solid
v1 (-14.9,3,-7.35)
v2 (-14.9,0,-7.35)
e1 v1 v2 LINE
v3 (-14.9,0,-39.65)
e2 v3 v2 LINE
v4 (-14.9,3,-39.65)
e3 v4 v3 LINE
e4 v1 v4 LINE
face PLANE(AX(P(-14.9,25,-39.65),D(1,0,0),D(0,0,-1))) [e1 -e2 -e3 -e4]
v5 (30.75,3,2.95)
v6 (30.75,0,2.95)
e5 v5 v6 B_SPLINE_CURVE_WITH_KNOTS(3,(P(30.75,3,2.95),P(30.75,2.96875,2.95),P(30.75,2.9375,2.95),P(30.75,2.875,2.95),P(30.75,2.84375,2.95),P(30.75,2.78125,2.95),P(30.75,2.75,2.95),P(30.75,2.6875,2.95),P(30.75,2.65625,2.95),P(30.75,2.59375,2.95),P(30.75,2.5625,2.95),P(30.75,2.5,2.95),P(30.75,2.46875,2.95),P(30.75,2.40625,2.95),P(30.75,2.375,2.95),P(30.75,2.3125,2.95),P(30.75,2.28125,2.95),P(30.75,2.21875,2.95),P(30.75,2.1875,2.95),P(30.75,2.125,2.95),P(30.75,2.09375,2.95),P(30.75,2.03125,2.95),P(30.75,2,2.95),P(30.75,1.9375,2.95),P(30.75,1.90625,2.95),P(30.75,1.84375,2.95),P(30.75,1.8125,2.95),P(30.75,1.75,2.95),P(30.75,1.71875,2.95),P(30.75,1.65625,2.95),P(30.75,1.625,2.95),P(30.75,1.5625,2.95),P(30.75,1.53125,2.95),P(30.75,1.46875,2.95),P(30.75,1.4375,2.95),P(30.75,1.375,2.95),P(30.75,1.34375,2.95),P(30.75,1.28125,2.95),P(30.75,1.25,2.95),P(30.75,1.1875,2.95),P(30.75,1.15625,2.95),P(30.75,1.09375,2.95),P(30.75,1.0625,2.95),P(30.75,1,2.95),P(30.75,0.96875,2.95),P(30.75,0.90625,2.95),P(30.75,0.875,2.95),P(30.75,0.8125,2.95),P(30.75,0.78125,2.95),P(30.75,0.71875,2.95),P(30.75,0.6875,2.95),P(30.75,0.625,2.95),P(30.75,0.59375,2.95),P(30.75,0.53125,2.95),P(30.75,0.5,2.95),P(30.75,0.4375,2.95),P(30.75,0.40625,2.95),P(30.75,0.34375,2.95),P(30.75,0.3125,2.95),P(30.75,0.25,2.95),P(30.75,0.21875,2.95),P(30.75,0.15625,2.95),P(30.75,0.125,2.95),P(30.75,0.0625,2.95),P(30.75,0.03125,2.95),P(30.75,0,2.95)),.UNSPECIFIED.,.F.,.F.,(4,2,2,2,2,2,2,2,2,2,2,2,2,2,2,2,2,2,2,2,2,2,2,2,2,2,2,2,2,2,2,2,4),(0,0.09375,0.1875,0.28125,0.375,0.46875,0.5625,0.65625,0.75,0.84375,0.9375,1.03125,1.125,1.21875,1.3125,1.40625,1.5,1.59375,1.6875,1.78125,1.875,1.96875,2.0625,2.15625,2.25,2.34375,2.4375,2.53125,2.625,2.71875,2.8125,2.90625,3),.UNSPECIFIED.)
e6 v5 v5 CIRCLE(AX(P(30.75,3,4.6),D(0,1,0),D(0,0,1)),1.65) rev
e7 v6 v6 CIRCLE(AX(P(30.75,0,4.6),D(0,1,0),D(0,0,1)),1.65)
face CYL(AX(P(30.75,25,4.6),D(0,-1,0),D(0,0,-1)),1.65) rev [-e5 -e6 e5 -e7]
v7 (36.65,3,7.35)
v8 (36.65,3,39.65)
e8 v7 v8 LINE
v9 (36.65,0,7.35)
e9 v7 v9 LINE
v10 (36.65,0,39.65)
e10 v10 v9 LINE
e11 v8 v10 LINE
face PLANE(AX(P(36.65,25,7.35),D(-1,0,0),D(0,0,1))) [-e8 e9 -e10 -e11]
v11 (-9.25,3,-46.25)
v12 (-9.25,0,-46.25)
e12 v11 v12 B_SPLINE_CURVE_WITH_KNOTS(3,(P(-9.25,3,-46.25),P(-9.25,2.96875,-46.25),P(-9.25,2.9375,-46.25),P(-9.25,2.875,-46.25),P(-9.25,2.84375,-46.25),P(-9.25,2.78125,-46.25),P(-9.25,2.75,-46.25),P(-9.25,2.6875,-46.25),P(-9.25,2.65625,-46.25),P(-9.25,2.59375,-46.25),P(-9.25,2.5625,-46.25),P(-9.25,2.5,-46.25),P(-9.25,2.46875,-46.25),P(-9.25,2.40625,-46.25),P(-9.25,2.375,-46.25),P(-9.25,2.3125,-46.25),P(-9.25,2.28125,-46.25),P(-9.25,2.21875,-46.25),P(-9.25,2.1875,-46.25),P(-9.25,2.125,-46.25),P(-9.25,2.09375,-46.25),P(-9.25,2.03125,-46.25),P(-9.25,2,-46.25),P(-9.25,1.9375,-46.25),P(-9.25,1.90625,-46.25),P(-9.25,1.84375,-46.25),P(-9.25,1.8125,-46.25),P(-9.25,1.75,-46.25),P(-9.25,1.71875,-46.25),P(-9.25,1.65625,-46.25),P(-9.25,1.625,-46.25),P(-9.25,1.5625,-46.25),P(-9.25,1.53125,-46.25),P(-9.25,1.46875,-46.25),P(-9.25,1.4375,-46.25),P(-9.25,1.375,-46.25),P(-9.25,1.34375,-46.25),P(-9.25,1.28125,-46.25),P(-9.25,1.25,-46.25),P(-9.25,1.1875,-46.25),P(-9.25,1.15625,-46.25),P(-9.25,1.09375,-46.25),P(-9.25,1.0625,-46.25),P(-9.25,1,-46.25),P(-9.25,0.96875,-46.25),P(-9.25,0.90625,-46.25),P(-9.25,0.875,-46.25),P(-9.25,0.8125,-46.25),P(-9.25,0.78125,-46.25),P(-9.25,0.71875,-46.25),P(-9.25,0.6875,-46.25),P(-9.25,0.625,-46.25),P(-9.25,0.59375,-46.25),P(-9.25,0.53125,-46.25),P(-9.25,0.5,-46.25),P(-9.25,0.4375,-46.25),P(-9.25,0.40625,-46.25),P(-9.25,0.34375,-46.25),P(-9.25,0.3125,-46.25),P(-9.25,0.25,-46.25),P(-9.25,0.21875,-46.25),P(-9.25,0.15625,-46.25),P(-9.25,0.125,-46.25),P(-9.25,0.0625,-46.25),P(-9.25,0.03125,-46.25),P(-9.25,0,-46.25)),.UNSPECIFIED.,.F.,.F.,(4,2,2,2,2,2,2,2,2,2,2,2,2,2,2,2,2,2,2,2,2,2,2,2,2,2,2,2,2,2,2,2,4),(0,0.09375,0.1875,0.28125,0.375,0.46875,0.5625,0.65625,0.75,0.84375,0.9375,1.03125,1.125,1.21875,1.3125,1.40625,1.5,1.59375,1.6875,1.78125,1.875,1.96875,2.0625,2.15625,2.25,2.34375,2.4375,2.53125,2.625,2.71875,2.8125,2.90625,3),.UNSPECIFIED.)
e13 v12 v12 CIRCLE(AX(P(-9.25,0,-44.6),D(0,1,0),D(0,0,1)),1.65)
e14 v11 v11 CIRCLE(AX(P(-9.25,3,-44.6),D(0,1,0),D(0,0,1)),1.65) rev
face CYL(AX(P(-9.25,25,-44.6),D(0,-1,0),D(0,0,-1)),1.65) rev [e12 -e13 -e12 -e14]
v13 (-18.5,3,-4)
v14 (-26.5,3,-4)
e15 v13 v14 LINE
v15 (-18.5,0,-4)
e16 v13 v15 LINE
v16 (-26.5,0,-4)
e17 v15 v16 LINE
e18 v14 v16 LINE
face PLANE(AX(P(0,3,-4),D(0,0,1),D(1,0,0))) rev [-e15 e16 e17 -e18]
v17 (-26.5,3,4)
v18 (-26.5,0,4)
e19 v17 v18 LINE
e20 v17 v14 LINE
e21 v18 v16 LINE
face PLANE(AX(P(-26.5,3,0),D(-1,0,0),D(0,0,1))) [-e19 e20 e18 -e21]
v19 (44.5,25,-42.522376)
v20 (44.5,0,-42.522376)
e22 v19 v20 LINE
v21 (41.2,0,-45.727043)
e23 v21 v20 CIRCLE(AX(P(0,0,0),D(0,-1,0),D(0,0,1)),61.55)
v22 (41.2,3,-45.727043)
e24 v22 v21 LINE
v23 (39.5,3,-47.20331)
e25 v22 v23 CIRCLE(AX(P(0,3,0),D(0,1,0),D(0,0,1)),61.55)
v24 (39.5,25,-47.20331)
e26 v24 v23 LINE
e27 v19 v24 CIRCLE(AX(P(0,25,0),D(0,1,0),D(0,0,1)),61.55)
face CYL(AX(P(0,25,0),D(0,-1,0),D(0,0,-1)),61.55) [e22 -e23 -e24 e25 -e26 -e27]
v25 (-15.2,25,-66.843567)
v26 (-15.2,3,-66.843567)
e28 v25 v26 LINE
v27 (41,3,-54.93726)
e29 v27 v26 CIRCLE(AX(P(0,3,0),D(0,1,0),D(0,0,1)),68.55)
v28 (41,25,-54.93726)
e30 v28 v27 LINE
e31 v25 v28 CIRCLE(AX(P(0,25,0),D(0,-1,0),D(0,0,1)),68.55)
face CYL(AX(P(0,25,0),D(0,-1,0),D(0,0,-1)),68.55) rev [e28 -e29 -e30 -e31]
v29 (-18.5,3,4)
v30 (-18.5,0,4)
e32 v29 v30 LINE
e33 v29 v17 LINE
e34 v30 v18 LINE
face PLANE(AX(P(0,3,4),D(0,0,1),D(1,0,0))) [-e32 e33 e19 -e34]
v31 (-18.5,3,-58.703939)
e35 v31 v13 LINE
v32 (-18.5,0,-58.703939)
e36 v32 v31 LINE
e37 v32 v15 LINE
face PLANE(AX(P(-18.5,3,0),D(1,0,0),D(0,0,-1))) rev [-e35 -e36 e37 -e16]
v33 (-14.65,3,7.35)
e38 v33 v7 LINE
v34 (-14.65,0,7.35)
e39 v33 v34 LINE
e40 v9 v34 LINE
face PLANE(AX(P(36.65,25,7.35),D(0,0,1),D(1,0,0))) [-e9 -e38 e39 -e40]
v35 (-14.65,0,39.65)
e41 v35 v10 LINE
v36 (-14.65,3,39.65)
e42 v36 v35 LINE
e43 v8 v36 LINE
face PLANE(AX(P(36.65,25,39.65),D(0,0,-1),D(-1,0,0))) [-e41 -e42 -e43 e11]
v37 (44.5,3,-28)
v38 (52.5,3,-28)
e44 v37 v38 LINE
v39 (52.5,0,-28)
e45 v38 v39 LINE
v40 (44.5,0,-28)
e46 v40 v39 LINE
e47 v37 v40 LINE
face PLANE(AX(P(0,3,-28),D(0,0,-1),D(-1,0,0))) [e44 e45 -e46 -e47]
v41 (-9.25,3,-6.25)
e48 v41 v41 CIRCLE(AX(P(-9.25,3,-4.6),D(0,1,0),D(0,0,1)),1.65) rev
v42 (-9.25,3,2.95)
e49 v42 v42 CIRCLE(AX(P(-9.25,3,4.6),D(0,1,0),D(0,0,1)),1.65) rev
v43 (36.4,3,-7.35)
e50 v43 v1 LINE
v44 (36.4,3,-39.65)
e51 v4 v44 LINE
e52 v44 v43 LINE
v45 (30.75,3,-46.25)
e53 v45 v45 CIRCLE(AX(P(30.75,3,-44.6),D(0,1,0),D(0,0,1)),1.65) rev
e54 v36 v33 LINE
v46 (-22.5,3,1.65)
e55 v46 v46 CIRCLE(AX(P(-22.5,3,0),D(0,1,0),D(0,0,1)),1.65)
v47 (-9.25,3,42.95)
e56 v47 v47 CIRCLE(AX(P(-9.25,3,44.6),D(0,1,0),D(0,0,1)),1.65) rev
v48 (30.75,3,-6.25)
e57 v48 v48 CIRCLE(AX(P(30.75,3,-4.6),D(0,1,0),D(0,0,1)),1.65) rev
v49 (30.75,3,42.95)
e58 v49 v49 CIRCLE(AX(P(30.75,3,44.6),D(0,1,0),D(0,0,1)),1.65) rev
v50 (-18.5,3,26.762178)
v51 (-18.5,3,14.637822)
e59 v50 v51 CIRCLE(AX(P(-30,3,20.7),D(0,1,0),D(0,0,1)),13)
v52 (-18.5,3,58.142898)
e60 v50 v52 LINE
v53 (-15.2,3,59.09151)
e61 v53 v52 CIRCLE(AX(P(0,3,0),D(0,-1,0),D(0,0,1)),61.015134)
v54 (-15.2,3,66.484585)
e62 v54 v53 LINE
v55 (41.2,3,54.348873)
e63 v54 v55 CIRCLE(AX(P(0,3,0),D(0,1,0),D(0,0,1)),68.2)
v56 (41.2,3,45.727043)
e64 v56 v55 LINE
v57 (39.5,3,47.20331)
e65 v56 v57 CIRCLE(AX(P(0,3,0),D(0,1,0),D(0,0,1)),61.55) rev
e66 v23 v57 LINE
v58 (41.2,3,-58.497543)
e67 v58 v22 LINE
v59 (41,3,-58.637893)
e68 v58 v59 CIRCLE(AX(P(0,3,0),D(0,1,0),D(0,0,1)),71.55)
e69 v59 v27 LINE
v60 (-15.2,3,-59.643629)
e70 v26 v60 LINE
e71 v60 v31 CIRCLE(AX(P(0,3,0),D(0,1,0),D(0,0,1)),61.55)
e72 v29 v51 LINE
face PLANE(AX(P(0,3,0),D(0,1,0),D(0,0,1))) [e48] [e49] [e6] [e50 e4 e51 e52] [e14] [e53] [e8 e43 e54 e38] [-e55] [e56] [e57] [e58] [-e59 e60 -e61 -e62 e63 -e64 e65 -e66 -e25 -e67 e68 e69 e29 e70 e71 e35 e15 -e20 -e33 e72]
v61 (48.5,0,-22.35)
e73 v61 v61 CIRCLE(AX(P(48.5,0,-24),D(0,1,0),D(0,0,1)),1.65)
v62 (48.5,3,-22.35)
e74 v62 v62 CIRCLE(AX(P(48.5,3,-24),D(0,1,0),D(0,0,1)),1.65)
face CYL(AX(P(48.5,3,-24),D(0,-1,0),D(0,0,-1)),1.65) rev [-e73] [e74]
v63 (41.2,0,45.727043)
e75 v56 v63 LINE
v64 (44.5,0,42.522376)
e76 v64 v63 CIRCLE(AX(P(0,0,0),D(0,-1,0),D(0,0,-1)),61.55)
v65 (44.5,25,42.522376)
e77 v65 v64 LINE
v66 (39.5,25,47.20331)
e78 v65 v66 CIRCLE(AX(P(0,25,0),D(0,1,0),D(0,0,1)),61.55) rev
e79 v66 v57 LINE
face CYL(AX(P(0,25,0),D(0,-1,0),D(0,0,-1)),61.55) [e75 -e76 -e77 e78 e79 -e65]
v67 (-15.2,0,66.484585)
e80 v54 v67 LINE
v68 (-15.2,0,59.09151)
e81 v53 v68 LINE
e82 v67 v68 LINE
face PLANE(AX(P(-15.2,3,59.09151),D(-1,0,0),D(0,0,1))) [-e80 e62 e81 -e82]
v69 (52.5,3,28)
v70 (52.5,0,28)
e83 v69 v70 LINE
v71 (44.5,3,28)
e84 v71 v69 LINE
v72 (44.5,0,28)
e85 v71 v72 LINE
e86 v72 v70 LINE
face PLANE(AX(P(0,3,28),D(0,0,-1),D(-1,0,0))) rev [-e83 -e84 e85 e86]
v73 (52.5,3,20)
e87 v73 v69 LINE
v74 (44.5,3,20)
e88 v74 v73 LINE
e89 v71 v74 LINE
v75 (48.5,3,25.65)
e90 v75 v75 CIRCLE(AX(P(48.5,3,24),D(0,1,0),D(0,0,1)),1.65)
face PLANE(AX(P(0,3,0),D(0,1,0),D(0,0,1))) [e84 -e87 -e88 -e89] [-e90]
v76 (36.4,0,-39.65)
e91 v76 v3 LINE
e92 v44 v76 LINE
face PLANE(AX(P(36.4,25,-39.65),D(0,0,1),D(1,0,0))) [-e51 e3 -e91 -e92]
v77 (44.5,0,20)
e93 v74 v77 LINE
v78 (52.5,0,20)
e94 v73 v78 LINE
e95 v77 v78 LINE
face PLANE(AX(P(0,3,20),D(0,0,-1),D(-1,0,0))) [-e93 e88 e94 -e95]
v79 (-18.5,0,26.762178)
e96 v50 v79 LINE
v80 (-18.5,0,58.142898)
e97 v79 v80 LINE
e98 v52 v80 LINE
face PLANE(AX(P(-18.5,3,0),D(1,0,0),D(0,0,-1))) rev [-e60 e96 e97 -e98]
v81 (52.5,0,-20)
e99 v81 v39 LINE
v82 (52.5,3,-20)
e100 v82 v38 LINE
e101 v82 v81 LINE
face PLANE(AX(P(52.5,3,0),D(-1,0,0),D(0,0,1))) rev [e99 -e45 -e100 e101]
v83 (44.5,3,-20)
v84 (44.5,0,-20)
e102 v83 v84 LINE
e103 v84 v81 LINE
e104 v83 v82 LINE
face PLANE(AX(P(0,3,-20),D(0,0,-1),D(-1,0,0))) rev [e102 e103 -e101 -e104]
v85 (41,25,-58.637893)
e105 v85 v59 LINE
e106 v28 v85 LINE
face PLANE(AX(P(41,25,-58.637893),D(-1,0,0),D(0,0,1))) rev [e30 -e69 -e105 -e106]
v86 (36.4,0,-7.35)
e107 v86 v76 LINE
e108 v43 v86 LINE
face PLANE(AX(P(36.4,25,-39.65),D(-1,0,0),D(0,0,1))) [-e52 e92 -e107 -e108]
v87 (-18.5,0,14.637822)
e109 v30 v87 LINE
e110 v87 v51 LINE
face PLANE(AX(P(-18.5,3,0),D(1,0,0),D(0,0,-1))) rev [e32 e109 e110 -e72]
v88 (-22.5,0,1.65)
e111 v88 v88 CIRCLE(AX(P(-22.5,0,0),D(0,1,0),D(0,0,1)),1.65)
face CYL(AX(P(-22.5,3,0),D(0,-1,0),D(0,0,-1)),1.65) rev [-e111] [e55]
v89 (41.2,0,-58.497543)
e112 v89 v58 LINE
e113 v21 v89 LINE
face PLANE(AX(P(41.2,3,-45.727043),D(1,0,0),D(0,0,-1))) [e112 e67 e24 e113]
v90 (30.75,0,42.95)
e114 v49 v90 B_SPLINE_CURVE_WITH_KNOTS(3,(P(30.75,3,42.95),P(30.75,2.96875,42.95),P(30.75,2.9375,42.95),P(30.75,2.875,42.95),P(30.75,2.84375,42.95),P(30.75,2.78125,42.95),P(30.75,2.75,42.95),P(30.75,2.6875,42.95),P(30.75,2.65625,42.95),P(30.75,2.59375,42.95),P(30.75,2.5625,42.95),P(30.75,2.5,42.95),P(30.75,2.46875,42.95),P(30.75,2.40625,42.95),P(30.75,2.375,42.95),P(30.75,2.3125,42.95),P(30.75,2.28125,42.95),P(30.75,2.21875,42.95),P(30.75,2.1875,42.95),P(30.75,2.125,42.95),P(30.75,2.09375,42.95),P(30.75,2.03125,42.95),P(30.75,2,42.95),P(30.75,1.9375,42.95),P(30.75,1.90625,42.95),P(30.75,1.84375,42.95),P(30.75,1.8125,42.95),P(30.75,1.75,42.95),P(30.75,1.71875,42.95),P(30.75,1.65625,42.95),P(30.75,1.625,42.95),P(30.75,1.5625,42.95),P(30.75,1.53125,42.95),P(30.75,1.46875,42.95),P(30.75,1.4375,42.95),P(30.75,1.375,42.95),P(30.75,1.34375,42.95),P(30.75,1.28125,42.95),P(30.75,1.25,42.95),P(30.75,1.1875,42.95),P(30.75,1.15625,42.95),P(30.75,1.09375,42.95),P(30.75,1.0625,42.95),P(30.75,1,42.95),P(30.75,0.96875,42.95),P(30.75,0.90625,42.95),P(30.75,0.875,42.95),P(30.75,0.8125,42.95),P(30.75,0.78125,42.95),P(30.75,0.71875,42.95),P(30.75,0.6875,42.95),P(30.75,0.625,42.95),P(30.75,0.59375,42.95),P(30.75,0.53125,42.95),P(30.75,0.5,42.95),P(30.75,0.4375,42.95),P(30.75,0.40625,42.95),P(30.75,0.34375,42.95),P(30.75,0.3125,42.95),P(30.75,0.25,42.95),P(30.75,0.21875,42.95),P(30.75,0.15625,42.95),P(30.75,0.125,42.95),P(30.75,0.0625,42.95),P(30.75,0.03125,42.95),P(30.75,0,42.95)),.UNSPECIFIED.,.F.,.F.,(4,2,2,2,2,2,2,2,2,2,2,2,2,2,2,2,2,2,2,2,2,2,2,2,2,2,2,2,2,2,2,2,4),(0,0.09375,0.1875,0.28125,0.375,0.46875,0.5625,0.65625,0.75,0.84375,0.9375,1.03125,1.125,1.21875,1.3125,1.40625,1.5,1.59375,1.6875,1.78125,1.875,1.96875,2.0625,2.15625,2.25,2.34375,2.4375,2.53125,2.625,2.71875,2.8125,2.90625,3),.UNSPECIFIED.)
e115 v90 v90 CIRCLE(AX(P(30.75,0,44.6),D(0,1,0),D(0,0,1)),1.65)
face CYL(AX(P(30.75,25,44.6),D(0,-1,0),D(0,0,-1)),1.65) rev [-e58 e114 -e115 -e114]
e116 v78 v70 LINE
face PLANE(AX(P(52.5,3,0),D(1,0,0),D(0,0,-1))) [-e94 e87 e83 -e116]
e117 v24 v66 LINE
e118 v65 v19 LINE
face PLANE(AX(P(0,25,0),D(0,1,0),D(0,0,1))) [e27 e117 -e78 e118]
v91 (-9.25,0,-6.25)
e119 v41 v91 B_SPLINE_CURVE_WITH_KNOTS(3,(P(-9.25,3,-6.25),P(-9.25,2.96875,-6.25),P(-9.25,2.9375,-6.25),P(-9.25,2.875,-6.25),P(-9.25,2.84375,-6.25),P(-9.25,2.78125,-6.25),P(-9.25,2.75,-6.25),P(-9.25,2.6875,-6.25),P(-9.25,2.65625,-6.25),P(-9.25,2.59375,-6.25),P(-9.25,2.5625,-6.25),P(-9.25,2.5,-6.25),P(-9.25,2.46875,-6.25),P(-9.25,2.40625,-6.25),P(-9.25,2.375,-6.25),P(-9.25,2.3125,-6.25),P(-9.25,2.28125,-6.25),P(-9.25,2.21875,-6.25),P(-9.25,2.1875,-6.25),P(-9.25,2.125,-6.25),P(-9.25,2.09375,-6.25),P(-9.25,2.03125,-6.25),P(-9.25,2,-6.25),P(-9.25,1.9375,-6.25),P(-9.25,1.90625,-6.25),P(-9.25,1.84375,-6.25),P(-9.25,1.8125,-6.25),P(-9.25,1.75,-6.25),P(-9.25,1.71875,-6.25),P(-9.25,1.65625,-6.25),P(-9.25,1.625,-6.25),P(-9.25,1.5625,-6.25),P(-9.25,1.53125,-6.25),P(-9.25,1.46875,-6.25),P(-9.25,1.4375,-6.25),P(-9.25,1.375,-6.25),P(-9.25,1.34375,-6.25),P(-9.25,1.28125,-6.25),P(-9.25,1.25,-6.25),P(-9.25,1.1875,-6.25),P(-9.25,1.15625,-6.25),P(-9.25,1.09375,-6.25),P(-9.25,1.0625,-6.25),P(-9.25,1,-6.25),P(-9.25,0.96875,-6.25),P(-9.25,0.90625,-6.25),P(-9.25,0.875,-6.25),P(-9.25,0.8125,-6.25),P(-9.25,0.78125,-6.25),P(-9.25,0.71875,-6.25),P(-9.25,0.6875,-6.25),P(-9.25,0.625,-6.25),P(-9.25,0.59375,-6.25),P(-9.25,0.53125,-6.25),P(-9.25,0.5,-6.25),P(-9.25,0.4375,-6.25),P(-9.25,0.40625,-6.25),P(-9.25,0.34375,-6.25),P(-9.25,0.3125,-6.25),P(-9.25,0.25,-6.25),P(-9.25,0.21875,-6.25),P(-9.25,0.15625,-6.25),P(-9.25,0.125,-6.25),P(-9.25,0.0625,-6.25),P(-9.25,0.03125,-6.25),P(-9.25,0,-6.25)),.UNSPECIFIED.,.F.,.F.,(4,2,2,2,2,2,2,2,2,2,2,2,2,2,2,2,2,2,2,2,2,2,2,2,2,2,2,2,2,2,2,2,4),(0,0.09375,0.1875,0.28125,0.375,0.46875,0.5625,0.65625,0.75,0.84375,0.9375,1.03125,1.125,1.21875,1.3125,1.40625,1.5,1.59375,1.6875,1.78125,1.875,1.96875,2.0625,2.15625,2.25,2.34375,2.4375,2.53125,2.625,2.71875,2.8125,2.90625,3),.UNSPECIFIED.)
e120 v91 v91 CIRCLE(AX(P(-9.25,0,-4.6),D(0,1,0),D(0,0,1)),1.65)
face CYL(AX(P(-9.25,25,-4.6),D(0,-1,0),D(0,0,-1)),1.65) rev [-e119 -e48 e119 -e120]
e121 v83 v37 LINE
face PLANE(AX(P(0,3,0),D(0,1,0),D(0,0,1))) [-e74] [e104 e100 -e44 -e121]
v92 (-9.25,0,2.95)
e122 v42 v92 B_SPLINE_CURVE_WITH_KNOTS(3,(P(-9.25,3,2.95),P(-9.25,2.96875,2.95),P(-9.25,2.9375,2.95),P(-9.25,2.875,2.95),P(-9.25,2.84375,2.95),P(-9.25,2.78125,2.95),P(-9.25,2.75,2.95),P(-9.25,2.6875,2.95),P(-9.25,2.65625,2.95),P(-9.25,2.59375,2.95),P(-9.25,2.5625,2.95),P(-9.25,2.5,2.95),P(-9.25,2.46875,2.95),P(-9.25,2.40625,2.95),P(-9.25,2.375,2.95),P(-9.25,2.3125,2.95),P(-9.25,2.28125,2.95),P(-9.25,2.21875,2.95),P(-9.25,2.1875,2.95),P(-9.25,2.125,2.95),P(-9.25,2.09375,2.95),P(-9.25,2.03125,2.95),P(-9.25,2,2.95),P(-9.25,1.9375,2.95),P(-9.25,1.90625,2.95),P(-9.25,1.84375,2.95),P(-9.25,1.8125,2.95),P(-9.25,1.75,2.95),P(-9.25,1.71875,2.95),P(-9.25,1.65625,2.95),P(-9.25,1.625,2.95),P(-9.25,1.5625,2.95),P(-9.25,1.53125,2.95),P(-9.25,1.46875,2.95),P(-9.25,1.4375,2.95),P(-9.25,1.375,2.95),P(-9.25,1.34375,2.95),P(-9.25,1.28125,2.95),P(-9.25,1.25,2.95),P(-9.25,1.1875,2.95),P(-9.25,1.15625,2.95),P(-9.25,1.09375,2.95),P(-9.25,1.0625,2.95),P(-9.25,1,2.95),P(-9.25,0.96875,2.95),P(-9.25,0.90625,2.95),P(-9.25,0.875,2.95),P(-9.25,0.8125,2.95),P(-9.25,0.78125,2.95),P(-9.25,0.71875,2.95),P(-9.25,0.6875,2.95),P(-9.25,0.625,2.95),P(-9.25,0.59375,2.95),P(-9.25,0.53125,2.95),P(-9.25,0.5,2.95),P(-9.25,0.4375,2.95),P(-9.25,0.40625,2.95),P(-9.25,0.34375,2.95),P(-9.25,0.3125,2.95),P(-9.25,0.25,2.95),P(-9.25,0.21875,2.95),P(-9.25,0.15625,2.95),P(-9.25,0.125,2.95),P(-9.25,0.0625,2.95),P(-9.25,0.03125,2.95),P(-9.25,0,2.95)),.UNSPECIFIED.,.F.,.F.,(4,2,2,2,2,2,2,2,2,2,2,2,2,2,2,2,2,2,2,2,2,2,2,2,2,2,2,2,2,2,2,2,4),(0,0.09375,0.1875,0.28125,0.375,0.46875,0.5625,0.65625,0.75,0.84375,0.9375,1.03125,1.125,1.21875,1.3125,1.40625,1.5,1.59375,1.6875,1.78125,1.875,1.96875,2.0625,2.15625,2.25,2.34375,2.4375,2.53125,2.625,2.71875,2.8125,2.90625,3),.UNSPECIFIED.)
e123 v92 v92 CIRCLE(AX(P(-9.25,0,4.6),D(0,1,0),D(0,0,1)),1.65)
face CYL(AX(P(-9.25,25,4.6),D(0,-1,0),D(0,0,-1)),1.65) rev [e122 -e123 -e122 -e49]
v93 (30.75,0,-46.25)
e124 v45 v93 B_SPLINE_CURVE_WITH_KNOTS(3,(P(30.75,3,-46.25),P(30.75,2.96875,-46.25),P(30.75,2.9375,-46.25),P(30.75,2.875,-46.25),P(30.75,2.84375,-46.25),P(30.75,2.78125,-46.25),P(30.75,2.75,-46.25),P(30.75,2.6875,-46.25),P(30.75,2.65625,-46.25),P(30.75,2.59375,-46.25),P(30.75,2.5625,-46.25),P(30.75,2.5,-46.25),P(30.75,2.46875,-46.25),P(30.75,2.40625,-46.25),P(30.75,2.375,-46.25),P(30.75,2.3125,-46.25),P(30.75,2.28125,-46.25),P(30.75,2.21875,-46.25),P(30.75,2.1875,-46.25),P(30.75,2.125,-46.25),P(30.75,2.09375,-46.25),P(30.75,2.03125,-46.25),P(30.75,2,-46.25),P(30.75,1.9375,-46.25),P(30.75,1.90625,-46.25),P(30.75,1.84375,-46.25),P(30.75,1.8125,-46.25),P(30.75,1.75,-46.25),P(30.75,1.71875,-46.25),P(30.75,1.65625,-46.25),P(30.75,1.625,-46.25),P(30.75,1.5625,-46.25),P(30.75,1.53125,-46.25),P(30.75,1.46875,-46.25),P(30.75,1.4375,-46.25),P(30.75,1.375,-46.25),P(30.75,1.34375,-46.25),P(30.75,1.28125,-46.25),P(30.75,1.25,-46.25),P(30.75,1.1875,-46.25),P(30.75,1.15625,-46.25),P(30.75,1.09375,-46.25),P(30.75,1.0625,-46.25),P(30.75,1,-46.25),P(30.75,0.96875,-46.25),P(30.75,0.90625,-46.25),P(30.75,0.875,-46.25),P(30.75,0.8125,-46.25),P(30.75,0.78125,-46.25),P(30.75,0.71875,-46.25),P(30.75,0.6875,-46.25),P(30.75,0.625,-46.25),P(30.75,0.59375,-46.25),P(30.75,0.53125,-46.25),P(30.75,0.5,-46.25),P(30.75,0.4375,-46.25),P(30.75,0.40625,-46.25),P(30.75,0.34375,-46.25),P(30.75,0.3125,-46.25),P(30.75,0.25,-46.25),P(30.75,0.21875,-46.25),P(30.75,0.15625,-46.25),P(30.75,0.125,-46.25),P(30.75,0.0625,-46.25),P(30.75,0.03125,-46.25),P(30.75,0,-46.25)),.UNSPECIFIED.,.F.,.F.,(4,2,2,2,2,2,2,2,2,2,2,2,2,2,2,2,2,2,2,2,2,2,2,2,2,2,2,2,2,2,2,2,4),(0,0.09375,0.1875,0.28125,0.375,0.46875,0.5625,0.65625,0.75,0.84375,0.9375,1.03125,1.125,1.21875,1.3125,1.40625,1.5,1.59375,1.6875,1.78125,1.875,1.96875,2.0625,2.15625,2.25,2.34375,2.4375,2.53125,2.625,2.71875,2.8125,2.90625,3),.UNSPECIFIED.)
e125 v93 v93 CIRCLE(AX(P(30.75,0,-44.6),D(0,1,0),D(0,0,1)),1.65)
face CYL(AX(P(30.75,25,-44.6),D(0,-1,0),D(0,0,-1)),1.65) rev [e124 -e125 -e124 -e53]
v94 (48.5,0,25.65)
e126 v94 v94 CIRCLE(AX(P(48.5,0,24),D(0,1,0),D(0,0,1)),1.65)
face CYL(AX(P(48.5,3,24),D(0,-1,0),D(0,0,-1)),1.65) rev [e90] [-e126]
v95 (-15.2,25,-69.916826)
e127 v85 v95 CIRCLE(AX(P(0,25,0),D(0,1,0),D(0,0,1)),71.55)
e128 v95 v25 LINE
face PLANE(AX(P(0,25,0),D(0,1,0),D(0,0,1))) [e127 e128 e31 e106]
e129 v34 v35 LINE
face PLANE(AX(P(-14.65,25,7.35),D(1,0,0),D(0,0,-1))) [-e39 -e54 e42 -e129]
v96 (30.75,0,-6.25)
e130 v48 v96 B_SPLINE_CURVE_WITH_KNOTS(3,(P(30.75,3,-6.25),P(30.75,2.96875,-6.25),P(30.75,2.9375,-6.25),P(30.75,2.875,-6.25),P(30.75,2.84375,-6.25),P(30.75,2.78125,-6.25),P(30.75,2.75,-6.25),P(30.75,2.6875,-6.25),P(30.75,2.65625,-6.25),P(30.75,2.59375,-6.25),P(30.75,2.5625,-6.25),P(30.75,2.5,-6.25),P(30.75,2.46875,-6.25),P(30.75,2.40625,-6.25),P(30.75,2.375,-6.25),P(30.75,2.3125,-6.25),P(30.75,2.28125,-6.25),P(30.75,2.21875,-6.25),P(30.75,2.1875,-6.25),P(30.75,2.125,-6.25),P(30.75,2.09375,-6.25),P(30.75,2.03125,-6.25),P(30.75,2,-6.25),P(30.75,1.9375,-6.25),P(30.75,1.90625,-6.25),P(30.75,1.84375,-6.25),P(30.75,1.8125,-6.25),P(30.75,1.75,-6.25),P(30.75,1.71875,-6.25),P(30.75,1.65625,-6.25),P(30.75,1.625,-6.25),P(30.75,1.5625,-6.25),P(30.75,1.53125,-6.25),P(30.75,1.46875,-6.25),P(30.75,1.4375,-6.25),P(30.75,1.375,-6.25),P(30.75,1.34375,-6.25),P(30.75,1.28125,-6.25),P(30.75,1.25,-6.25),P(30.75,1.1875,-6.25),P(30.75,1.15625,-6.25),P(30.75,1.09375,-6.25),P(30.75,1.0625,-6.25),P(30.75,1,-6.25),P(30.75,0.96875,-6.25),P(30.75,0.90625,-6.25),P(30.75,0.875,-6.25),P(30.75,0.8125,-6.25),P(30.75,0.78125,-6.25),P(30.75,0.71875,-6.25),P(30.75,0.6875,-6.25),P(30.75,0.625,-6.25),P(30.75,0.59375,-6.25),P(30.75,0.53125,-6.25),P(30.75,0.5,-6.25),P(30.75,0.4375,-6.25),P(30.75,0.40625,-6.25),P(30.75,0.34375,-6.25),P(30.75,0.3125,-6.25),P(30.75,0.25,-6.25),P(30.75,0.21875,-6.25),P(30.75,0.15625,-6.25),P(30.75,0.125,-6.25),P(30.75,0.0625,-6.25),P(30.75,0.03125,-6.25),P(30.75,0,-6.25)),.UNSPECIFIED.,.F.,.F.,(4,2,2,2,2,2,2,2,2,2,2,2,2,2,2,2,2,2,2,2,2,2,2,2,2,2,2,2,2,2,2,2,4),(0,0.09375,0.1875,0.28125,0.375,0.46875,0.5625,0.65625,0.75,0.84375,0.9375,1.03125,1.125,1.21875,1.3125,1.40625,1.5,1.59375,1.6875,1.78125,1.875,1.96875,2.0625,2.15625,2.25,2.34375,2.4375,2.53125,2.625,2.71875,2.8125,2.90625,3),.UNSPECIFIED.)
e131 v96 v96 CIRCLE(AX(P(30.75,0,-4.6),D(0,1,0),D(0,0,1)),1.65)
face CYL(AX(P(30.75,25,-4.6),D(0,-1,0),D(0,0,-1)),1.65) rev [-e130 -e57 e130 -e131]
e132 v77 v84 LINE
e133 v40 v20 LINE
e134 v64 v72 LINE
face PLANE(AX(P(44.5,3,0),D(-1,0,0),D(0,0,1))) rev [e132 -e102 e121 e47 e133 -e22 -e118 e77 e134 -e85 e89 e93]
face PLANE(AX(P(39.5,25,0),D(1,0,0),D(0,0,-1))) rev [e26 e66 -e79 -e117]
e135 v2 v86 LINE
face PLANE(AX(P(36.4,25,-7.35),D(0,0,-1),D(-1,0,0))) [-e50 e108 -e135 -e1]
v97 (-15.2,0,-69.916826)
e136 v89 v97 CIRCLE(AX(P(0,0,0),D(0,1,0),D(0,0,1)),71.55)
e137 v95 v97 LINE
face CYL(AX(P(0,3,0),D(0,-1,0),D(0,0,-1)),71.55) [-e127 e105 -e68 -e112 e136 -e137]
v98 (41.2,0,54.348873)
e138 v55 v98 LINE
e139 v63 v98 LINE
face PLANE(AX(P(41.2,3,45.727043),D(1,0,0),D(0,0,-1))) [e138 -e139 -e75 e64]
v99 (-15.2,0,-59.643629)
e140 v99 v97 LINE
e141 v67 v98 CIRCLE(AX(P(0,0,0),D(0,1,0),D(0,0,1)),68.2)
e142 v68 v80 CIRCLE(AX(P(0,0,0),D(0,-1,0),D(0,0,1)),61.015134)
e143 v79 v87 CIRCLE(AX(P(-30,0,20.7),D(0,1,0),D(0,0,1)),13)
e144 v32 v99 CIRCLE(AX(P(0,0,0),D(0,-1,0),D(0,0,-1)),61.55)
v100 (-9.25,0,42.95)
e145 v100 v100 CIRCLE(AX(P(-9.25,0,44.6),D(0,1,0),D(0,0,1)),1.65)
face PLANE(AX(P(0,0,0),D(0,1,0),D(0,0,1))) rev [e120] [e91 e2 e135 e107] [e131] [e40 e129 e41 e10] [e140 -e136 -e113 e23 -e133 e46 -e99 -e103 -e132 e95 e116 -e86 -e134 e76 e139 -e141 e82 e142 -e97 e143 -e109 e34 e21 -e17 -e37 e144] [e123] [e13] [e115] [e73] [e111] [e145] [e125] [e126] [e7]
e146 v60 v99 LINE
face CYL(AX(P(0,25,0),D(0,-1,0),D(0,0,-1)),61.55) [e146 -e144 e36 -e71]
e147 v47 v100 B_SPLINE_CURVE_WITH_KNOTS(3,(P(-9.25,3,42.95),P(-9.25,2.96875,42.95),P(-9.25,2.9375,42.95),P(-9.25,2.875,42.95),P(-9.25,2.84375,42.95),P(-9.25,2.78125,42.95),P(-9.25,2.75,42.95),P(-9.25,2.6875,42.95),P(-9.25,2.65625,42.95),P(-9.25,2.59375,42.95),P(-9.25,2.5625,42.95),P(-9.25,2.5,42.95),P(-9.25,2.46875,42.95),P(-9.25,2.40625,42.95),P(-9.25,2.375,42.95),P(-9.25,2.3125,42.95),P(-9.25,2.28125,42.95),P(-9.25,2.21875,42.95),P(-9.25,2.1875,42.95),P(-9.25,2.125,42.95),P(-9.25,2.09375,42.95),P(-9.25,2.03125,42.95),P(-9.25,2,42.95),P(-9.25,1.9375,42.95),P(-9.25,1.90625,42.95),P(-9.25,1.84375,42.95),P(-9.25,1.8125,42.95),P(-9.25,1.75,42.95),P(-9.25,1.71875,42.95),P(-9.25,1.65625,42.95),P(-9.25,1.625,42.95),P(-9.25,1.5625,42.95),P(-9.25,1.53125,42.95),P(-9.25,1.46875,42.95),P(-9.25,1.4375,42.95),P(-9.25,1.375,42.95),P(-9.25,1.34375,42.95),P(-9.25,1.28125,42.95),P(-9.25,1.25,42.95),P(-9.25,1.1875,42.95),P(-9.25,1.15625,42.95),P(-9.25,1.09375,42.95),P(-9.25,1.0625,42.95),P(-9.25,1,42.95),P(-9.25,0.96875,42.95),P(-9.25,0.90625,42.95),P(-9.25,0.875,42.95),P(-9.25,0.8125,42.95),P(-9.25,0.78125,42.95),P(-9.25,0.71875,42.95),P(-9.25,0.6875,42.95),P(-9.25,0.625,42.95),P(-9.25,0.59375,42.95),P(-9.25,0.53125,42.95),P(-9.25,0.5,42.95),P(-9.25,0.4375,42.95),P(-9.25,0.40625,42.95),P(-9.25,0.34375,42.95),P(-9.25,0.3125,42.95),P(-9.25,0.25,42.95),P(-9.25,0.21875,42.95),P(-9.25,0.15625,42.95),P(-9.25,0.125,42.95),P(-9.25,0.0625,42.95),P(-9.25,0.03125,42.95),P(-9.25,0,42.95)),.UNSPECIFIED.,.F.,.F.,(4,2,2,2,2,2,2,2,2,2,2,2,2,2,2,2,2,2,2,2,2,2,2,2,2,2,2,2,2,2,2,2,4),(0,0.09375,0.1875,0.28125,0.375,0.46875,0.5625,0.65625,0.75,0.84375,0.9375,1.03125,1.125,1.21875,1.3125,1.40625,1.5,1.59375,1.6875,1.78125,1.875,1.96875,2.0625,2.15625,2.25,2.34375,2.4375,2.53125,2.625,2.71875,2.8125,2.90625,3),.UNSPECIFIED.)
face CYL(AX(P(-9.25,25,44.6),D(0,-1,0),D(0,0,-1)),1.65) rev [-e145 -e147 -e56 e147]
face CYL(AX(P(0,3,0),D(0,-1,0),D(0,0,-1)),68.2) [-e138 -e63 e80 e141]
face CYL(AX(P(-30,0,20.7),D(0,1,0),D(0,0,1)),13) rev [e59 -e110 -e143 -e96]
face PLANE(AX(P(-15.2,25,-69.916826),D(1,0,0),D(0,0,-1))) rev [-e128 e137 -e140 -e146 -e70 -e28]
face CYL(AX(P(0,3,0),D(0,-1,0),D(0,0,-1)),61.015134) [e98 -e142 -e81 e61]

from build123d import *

# Parameters (mm, degrees)
SKETCH1_W           = 8
SKETCH1_H           = 8
SKETCH1_R           = 1.65
BOSS_EXTRUDE1_DEPTH = 3
BOSS_EXTRUDE2_DEPTH = 22
SKETCH3_R           = 13
CUT_EXTRUDE1_DEPTH  = 92.431135288
CUT_EXTRUDE3_DEPTH  = 3
SKETCH6_R           = 1.65
SKETCH6_W           = 51.3
SKETCH6_H           = 32.3
CUT_EXTRUDE4_DEPTH  = 93.198983183
BOSS_EXTRUDE4_DEPTH = 25
CUT_EXTRUDE5_DEPTH  = 93.198983183


# Read off the part's stored shape, not the designer's step: Cut-Extrude3
with BuildPart() as part:
    # Sketch1 → Boss-Extrude1 (new body)
    # profile 1 of 4: a face of its own
    with BuildSketch(Plane(origin=(0, 0, 0), x_dir=(1, 0, 0), z_dir=(0, 1, 0))):
        with BuildLine():
            Line((-18.5, 69.116947994), (-18.5, 4))
            Line((-18.5, 4), (-18.5, -4))
            Line((-18.5, -4), (-18.5, -65.642897559))
            ThreePointArc((-18.5, -65.642897559), (14.755653403, -66.584613032), (44.5, -51.681621492))
            Line((44.5, -51.681621492), (44.5, -28))
            Line((44.5, -28), (44.5, -20))
            Line((44.5, -20), (44.5, 20))
            Line((44.5, 20), (44.5, 28))
            Line((44.5, 28), (44.5, 55))
            Line((44.5, 55), (44.5, 56.028140251))
            ThreePointArc((44.5, 56.028140251), (14.554354058, 70.054073957), (-18.5, 69.116947994))
        make_face()
    # profile 2 of 4: a face of its own
    with BuildSketch(Plane(origin=(0, 0, 0), x_dir=(1, 0, 0), z_dir=(0, 1, 0))):
        with Locations((-22.5, 0)):
            Rectangle(SKETCH1_W, SKETCH1_H)
        with Locations(Location((-22.5, 0, 0), (0, 0, 270))):
            Circle(SKETCH1_R, mode=Mode.SUBTRACT)
    # profile 3 of 4: a face of its own
    with BuildSketch(Plane(origin=(0, 0, 0), x_dir=(1, 0, 0), z_dir=(0, 1, 0))):
        with Locations((48.5, -24)):
            Rectangle(SKETCH1_W, SKETCH1_H)
        with Locations(Location((48.5, -24, 0), (0, 0, 270))):
            Circle(SKETCH1_R, mode=Mode.SUBTRACT)
    # profile 4 of 4: a face of its own
    with BuildSketch(Plane(origin=(0, 0, 0), x_dir=(1, 0, 0), z_dir=(0, 1, 0))):
        with Locations((48.5, 24)):
            Rectangle(SKETCH1_W, SKETCH1_H)
        with Locations(Location((48.5, 24, 0), (0, 0, 270))):
            Circle(SKETCH1_R, mode=Mode.SUBTRACT)
    extrude(amount=BOSS_EXTRUDE1_DEPTH)

    # Sketch2 → Boss-Extrude2 (add)
    with BuildSketch(Plane(origin=(0, 3, 0), x_dir=(1, 0, 0), z_dir=(0, 1, 0))):
        with BuildLine():
            Line((44.5, -42.522376462), (44.5, 42.522376462))
            ThreePointArc((44.5, 42.522376462), (42.065161183, 44.932446124), (39.5, 47.203310265))
            Line((39.5, 47.203310265), (39.5, -47.203310265))
            ThreePointArc((39.5, -47.203310265), (42.065161183, -44.932446124), (44.5, -42.522376462))
        make_face()
    extrude(amount=BOSS_EXTRUDE2_DEPTH)

    # Sketch3 → Cut-Extrude1 (cut, through all)
    with BuildSketch(Plane(origin=(0, 3, 0), x_dir=(1, 0, 0), z_dir=(0, 1, 0))):
        with Locations((-30, -20.7)):
            Circle(SKETCH3_R)
    extrude(amount=-CUT_EXTRUDE1_DEPTH, mode=Mode.SUBTRACT)

    # Cut-Extrude3 outline → Cut-Extrude3 (cut)
    with BuildSketch(Plane(origin=(0, 0, 0), x_dir=(1, 0, 0), z_dir=(0, 1, 0))):
        with BuildLine():
            Line((44.5, -51.681621492), (44.5, -42.522376462))
            ThreePointArc((44.5, -42.522376462), (42.879948374, -44.155549226), (41.2, -45.727043421))
            Line((41.2, -45.727043421), (41.2, -54.348873033))
            ThreePointArc((41.2, -54.348873033), (42.870748276, -53.040917623), (44.5, -51.681621492))
        make_face()
        with BuildLine():
            ThreePointArc((41.2, 45.727043421), (42.879948374, 44.155549226), (44.5, 42.522376462))
            Line((44.5, 42.522376462), (44.5, 56.028140251))
            ThreePointArc((44.5, 56.028140251), (42.867784957, 57.286608495), (41.2, 58.497542683))
            Line((41.2, 58.497542683), (41.2, 45.727043421))
        make_face()
        with BuildLine():
            ThreePointArc((-18.5, -65.642897559), (-16.85525465, -66.084343007), (-15.2, -66.484584679))
            Line((-15.2, -66.484584679), (-15.2, -59.091509852))
            ThreePointArc((-15.2, -59.091509852), (-16.856674237, -58.640421812), (-18.5, -58.142897559))
            Line((-18.5, -58.142897559), (-18.5, -65.642897559))
        make_face()
    extrude(amount=CUT_EXTRUDE3_DEPTH, mode=Mode.SUBTRACT)

    # Sketch6 → Cut-Extrude4 (cut, through all)
    with BuildSketch(Plane(origin=(0, 0, 0), x_dir=(1, 0, 0), z_dir=(0, 1, 0))):
        with Locations(Location((-9.25, 44.6, 0), (0, 0, 90))):
            Circle(SKETCH6_R)
        with Locations(Location((-9.25, 4.6, 0), (0, 0, 90))):
            Circle(SKETCH6_R)
        with Locations(Location((30.75, 4.6, 0), (0, 0, 90))):
            Circle(SKETCH6_R)
        with Locations(Location((30.75, 44.6, 0), (0, 0, 90))):
            Circle(SKETCH6_R)
        with Locations(Location((-9.25, -4.6, 0), (0, 0, 90))):
            Circle(SKETCH6_R)
        with Locations(Location((30.75, -4.6, 0), (0, 0, 90))):
            Circle(SKETCH6_R)
        with Locations(Location((30.75, -44.6, 0), (0, 0, 90))):
            Circle(SKETCH6_R)
        with Locations(Location((-9.25, -44.6, 0), (0, 0, 90))):
            Circle(SKETCH6_R)
        with Locations((10.75, 23.5)):
            Rectangle(SKETCH6_W, SKETCH6_H)
        with Locations((11, -23.5)):
            Rectangle(SKETCH6_W, SKETCH6_H)
    extrude(amount=CUT_EXTRUDE4_DEPTH, mode=Mode.SUBTRACT)

    # Sketch8 → Boss-Extrude4 (add)
    with BuildSketch(Plane(origin=(0, 0, 0), x_dir=(1, 0, 0), z_dir=(0, 1, 0))):
        with BuildLine():
            Line((41, 58.637893039), (41, 54.93725967))
            ThreePointArc((41, 54.93725967), (14.207393879, 67.061557238), (-15.2, 66.843567379))
            Line((-15.2, 66.843567379), (-15.2, 69.916825586))
            ThreePointArc((-15.2, 69.916825586), (14.078834464, 70.151186164), (41, 58.637893039))
        make_face()
    extrude(amount=BOSS_EXTRUDE4_DEPTH)

    # Sketch9 → Cut-Extrude5 (cut, through all)
    with BuildSketch(Plane(origin=(0, 0, 0), x_dir=(1, 0, 0), z_dir=(0, 1, 0))):
        with BuildLine():
            Line((-18.5, 58.703939391), (-18.5, 74.933190401))
            Line((-18.5, 74.933190401), (-15.2, 74.933190401))
            Line((-15.2, 74.933190401), (-15.2, 59.643629165))
            ThreePointArc((-15.2, 59.643629165), (-16.856549297, 59.196784083), (-18.5, 58.703939391))
        make_face()
    extrude(amount=CUT_EXTRUDE5_DEPTH, mode=Mode.SUBTRACT)


solid = part.part
